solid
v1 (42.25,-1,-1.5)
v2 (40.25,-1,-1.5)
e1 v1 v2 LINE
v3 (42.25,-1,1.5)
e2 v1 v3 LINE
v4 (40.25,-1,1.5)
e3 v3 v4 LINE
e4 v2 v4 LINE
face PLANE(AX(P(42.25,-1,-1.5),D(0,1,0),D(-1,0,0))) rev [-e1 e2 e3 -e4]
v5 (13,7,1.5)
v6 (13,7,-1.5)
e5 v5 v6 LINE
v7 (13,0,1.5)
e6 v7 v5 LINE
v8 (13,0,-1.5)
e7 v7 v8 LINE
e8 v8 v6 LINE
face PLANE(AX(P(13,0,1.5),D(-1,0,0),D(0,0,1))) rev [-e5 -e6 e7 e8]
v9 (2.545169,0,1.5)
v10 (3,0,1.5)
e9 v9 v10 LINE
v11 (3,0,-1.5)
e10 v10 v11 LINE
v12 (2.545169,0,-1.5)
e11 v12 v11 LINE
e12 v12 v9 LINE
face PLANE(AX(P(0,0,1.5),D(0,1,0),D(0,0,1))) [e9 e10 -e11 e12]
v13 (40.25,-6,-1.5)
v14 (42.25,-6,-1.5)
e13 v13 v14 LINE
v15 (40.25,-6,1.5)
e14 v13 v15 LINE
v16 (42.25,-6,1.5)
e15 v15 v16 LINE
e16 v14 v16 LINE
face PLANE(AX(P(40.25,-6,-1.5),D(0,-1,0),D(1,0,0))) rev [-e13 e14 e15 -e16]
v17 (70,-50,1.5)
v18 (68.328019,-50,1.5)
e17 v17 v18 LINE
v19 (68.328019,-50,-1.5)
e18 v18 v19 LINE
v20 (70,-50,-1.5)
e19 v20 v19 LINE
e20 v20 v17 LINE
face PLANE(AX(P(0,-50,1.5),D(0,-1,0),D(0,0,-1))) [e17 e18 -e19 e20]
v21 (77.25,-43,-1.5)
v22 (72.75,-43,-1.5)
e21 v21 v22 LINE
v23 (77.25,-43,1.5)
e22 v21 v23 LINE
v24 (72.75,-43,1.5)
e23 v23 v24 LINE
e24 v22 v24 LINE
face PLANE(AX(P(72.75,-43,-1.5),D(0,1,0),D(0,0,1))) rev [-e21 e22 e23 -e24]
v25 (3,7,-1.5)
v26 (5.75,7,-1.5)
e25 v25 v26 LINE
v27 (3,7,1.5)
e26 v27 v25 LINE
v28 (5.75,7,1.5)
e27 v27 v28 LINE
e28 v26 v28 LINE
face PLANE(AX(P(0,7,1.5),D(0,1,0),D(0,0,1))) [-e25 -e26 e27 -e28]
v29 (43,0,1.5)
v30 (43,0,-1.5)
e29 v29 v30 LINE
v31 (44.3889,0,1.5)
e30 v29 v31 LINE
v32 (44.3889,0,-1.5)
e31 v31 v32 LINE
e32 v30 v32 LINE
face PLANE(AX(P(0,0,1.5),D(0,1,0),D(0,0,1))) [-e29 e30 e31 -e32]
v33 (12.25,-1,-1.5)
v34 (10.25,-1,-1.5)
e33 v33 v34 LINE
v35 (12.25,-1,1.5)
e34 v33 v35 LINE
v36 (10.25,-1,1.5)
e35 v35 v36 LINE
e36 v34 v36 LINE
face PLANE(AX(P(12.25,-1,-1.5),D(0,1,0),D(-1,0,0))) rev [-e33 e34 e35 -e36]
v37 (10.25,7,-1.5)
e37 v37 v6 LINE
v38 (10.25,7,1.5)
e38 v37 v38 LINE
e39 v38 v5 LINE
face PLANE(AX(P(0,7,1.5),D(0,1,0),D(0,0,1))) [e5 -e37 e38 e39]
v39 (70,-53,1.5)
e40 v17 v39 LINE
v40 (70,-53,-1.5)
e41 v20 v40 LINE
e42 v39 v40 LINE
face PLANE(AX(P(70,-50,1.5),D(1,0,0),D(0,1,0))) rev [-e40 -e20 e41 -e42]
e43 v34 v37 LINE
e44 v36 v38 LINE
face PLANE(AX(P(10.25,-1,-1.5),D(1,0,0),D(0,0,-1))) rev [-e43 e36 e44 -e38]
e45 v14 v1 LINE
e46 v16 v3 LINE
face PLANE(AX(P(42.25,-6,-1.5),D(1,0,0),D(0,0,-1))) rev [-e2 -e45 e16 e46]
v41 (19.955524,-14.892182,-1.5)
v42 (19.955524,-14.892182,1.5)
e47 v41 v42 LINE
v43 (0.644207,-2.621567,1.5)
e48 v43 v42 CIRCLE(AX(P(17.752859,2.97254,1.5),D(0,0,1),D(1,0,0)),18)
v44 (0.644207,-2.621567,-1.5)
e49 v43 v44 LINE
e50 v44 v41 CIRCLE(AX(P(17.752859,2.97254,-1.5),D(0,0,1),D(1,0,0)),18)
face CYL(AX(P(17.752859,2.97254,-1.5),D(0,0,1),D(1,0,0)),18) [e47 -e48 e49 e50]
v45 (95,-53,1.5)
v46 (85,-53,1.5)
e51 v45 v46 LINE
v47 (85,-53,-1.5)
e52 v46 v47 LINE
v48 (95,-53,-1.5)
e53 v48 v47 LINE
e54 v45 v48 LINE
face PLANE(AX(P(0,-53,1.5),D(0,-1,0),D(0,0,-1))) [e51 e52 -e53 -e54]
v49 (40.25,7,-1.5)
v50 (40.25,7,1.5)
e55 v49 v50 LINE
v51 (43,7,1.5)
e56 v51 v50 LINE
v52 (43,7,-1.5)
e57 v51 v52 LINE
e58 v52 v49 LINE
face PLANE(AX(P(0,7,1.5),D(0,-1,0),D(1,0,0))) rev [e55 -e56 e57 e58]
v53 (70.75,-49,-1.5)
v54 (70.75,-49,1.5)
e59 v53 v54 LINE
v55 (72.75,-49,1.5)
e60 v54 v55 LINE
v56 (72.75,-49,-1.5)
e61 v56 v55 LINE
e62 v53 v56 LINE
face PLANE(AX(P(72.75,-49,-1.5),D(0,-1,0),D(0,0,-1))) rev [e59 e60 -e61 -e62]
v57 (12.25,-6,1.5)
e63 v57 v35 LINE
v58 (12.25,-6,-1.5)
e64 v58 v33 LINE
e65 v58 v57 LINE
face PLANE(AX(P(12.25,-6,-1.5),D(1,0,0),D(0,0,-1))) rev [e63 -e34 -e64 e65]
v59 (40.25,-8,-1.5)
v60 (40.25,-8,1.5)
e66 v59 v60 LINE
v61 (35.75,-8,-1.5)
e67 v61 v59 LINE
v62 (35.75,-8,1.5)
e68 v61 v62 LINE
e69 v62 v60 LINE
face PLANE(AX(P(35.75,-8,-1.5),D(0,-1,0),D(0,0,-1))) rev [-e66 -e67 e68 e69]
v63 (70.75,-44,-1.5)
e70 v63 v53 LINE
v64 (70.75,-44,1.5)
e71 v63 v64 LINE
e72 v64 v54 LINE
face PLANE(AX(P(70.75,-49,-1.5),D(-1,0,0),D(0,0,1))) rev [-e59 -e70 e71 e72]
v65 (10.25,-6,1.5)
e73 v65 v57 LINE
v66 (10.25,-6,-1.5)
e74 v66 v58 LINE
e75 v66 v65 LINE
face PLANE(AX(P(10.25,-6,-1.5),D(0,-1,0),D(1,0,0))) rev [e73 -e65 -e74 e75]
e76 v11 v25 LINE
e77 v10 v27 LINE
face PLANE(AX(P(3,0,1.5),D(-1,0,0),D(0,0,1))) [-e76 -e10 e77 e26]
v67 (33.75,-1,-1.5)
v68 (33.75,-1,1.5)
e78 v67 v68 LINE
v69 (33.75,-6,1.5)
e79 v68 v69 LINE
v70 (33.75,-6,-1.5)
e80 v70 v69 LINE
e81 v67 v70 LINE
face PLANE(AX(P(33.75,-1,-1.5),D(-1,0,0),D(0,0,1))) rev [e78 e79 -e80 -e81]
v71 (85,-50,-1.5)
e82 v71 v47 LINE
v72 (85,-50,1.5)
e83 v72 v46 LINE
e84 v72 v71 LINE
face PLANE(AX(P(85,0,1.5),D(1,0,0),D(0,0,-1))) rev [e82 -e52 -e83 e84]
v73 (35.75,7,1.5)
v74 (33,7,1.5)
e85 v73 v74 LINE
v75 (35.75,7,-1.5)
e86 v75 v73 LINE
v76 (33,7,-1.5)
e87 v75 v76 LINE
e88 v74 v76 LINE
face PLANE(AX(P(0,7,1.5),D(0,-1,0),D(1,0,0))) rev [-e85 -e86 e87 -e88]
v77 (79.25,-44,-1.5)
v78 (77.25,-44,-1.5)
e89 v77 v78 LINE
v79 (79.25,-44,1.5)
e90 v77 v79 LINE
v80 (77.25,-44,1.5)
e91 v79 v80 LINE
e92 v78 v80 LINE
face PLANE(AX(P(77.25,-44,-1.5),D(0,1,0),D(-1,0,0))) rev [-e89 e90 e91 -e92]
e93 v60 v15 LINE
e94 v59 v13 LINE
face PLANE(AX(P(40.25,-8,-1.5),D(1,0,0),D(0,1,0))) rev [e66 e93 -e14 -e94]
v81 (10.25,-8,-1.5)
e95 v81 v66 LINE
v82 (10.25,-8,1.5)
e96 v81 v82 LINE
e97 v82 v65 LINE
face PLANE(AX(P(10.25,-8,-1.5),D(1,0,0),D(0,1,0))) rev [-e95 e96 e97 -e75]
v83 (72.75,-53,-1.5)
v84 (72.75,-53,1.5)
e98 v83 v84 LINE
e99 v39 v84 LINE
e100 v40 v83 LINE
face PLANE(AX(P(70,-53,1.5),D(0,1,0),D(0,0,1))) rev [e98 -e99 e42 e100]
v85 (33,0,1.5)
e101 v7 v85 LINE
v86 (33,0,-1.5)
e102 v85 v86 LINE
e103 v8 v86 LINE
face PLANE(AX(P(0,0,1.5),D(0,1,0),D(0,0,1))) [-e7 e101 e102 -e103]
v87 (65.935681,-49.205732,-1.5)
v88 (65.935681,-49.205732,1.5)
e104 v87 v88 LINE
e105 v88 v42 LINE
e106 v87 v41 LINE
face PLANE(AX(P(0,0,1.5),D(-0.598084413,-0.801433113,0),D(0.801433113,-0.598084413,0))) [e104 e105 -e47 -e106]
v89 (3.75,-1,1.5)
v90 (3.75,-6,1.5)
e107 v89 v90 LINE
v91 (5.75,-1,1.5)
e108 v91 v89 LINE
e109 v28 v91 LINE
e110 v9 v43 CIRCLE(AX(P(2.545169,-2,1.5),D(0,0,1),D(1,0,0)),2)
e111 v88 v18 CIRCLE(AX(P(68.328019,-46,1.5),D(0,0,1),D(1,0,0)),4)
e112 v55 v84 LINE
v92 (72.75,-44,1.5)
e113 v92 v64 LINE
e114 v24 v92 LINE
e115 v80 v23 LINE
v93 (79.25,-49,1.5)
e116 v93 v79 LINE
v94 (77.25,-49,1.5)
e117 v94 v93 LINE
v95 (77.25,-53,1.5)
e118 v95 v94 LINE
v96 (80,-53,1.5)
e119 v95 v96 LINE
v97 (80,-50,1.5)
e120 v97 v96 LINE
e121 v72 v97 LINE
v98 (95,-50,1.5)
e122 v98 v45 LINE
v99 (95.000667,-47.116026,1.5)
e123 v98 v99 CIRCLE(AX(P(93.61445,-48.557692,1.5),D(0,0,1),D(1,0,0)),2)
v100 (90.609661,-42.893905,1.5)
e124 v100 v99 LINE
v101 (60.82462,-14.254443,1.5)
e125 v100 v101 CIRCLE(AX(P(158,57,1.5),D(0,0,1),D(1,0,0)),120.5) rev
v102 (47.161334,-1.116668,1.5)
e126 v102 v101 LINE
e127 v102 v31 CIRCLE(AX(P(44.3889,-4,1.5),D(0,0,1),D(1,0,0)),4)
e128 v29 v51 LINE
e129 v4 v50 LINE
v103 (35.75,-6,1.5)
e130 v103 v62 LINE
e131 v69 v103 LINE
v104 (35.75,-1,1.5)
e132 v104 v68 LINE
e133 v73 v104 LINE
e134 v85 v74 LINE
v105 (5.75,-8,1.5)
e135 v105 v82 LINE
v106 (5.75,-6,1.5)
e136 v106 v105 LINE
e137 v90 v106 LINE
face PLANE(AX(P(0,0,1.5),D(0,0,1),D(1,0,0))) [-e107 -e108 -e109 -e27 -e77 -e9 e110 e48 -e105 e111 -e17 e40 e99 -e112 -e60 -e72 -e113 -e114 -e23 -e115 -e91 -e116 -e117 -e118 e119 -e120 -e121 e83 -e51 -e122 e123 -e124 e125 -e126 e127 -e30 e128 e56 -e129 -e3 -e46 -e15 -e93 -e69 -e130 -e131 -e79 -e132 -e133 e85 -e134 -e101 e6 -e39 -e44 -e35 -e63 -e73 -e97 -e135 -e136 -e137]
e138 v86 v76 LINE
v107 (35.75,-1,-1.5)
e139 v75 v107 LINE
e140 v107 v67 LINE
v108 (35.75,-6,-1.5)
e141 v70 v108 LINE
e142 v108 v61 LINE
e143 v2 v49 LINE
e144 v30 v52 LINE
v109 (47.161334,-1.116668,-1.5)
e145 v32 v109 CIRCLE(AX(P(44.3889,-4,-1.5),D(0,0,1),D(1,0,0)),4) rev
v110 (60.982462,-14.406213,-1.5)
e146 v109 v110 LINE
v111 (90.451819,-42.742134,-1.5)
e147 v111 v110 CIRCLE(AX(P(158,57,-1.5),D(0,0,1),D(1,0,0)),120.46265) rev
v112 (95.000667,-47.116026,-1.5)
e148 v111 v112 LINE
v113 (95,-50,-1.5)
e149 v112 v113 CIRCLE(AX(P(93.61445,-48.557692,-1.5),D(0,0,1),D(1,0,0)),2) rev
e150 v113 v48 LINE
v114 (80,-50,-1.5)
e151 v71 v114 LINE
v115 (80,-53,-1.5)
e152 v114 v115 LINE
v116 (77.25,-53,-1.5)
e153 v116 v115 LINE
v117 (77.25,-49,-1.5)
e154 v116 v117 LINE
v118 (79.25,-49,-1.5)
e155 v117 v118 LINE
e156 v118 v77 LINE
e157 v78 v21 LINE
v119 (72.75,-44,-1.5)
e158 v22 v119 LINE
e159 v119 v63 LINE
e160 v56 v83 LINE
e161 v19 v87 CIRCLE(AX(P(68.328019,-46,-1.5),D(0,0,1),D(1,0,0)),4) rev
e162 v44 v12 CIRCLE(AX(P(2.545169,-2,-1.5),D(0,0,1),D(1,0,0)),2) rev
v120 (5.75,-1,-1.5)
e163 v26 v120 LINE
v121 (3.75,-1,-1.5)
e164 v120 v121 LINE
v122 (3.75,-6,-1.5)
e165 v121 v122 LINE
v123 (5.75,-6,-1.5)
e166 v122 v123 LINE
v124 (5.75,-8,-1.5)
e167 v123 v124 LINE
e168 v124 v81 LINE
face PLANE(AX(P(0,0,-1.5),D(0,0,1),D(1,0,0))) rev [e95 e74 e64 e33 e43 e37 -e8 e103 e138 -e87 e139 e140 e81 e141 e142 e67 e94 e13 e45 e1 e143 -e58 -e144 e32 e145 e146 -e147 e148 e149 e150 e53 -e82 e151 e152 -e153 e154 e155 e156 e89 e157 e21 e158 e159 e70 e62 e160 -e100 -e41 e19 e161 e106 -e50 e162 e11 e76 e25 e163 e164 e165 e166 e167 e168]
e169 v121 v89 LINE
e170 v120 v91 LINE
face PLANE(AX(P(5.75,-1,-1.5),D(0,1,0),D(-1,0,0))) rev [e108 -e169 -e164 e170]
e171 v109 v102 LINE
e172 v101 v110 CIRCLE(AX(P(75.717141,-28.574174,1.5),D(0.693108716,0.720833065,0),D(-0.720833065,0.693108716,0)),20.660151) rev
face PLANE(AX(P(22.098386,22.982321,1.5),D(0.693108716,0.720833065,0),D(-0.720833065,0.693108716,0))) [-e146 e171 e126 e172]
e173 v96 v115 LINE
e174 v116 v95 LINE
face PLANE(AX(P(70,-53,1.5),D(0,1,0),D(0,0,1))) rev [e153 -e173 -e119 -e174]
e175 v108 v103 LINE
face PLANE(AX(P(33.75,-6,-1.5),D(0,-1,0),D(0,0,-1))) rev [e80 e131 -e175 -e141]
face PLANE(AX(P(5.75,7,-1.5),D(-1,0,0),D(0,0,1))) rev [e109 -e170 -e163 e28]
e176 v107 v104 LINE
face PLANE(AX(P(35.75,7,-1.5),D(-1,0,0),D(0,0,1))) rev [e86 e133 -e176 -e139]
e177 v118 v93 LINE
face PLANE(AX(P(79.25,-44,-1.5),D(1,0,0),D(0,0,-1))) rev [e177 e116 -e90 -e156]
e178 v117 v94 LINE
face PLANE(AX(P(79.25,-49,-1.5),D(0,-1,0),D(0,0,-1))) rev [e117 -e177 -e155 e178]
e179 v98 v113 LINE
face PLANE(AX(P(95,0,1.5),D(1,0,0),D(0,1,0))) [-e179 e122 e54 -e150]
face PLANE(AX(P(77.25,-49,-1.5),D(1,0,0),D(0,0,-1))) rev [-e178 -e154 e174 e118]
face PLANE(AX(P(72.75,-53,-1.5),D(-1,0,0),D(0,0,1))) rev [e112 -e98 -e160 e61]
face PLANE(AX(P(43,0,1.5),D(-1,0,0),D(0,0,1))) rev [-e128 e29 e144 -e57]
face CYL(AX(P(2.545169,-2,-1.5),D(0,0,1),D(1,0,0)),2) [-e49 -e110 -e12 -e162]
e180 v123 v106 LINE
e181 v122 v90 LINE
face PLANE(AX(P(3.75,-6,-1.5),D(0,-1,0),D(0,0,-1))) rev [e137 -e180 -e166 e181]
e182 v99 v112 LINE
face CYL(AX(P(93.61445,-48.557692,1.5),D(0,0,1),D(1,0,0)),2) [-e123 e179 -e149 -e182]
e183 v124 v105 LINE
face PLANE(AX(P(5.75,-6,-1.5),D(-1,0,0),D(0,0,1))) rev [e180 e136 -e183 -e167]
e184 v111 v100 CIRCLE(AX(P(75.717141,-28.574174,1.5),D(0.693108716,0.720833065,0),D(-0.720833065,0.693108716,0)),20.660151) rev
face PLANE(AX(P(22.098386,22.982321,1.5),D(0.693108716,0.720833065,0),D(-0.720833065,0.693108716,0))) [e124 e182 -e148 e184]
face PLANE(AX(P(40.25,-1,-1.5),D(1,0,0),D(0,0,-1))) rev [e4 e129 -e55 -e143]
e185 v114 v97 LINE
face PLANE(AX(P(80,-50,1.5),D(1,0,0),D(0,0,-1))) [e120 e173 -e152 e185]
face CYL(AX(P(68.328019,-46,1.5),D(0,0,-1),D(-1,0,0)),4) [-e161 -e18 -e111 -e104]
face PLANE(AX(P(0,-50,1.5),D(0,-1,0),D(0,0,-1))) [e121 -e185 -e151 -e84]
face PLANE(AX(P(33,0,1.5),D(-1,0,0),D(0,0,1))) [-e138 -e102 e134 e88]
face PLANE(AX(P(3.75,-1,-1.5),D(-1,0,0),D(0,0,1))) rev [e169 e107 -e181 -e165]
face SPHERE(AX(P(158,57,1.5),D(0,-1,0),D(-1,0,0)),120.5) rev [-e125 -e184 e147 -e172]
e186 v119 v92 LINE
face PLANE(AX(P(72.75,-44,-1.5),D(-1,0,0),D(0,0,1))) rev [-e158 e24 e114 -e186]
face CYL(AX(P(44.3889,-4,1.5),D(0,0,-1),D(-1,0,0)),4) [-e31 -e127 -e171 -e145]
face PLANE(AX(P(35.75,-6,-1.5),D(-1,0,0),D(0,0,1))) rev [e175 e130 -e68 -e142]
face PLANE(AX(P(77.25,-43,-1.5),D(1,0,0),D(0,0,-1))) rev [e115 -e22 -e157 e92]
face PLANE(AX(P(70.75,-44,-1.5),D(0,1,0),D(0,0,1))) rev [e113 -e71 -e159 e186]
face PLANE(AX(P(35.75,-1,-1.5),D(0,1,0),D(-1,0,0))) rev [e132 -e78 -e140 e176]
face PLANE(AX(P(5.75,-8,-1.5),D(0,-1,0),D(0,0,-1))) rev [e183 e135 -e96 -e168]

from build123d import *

# Parameters (mm, degrees)
SKETCH_1_W          = 10
SKETCH_1_H          = 3
SKETCH_1_H_2        = 7
EXTRUDE_1_DEPTH     = 1.5
FILLET_1_R          = 4
EXTRUDE_2_DEPTH     = 3
CUT_EXTRUDE_1_DEPTH = 112.454026397
FILLET_2_R          = 2


with BuildPart() as part:
    # 草图1 → 凸台-拉伸1 (new, symmetric)
    with BuildSketch(Plane.XY):
        with Locations((90, -51.5)):
            Rectangle(SKETCH_1_W, SKETCH_1_H)
        Polygon((67, -50), (0, 0), (46, 0), (98, -50), align=None)
        with Locations((38, 3.5)):
            Rectangle(SKETCH_1_W, SKETCH_1_H_2)
        with Locations((8, 3.5)):
            Rectangle(SKETCH_1_W, SKETCH_1_H_2)
        with Locations((75, -51.5)):
            Rectangle(SKETCH_1_W, SKETCH_1_H)
    extrude(amount=EXTRUDE_1_DEPTH, both=True)

    # 圆角1
    fillet_1_edges = [part.edges().sort_by_distance(p)[0] for p in [
        (67, -50, 0),
        (46, 0, 0),
    ]]
    fillet(fillet_1_edges, radius=FILLET_1_R)

    # 草图5 → 凸台-拉伸2 (add)
    with BuildSketch(Plane.XY.offset(1.5)):
        with BuildLine():
            ThreePointArc((0, 0), (6.98733973, -11.453256458), (19.95552359, -14.892181783))
            Line((19.95552359, -14.892181783), (0, 0))
        make_face()
    extrude(amount=-EXTRUDE_2_DEPTH)

    # 草图2 → 切除-拉伸1 (cut, through all)
    with BuildSketch(Plane.XY.offset(1.5)):
        Polygon((72.75, -53), (72.75, -49), (70.75, -49), (70.75, -44), (72.75, -44), (72.75, -43), (77.25, -43), (77.25, -44), (79.25, -44), (79.25, -49), (77.25, -49), (77.25, -53), align=None)
        Polygon((35.75, 7), (35.75, -1), (33.75, -1), (33.75, -6), (35.75, -6), (35.75, -8), (40.25, -8), (40.25, -6), (42.25, -6), (42.25, -1), (40.25, -1), (40.25, 7), align=None)
        Polygon((10.25, 7), (5.75, 7), (5.75, -1), (3.75, -1), (3.75, -6), (5.75, -6), (5.75, -8), (10.25, -8), (10.25, -6), (12.25, -6), (12.25, -1), (10.25, -1), align=None)
    extrude(amount=-CUT_EXTRUDE_1_DEPTH, mode=Mode.SUBTRACT)

    # 草图3 → 切除-旋转3 (revolve, cut)
    with BuildSketch(Plane.XY.offset(1.5)):
        with BuildLine():
            Line((158, -63.5), (158, 177.5))
            ThreePointArc((158, 177.5), (37.5, 57), (158, -63.5))
        make_face()
    revolve(axis=Axis((158, -1021.279080972, 1.5), (0, 1, 0)), mode=Mode.SUBTRACT)

    # 圆角2
    # the kernel refuses this fillet: 2 mm, written as the material it takes off along each edge
    with BuildSketch(Plane(origin=(98, -50, -11.90231354), x_dir=(-1, 0, 0), z_dir=(0, 0, 1))) as fillet_2_piece_1:
        with BuildLine():
            CenterArc((4.385550053, -1.442307544), FILLET_2_R, 133.850179686, 92.273123028)
            Line((2.99933262, -2.883973674), (2.971608272, -2.912806996))
            Line((2.971608272, -2.912806996), (-0.027724349, -0.028833323))
            Line((-0.027724349, -0.028833323), (0, 0.04))
            ThreePointArc((0, 0.04), (1.5, 0.04), (2.972288999, 0.028846151))
            Line((2.972288999, 0.028846151), (3, 0))
        make_face()
    extrude(amount=23.80462708, mode=Mode.SUBTRACT)
    with BuildSketch(Plane(origin=(0, 0, 8.248897597), x_dir=(0.23863429141871206, -0.971109507192206, 0), z_dir=(0, 0, -1))) as fillet_2_piece_2:
        with BuildLine():
            CenterArc((2.549583536, -1.99436891), FILLET_2_R, 85.699481489, 108.106467665)
            Line((0.607364522, -2.471637493), (0.568520142, -2.481182864))
            Line((0.568520142, -2.481182864), (-0.03884438, -0.009545372))
            Line((-0.03884438, -0.009545372), (-0.00299951, 0.039887378))
            ThreePointArc((-0.00299951, 0.039887378), (1.349779519, 0.090679811), (2.702558549, 0.039887378))
            Line((2.702558549, 0.039887378), (2.699559039, 0))
        make_face()
    extrude(amount=16.497795193, mode=Mode.SUBTRACT)


solid = part.part
